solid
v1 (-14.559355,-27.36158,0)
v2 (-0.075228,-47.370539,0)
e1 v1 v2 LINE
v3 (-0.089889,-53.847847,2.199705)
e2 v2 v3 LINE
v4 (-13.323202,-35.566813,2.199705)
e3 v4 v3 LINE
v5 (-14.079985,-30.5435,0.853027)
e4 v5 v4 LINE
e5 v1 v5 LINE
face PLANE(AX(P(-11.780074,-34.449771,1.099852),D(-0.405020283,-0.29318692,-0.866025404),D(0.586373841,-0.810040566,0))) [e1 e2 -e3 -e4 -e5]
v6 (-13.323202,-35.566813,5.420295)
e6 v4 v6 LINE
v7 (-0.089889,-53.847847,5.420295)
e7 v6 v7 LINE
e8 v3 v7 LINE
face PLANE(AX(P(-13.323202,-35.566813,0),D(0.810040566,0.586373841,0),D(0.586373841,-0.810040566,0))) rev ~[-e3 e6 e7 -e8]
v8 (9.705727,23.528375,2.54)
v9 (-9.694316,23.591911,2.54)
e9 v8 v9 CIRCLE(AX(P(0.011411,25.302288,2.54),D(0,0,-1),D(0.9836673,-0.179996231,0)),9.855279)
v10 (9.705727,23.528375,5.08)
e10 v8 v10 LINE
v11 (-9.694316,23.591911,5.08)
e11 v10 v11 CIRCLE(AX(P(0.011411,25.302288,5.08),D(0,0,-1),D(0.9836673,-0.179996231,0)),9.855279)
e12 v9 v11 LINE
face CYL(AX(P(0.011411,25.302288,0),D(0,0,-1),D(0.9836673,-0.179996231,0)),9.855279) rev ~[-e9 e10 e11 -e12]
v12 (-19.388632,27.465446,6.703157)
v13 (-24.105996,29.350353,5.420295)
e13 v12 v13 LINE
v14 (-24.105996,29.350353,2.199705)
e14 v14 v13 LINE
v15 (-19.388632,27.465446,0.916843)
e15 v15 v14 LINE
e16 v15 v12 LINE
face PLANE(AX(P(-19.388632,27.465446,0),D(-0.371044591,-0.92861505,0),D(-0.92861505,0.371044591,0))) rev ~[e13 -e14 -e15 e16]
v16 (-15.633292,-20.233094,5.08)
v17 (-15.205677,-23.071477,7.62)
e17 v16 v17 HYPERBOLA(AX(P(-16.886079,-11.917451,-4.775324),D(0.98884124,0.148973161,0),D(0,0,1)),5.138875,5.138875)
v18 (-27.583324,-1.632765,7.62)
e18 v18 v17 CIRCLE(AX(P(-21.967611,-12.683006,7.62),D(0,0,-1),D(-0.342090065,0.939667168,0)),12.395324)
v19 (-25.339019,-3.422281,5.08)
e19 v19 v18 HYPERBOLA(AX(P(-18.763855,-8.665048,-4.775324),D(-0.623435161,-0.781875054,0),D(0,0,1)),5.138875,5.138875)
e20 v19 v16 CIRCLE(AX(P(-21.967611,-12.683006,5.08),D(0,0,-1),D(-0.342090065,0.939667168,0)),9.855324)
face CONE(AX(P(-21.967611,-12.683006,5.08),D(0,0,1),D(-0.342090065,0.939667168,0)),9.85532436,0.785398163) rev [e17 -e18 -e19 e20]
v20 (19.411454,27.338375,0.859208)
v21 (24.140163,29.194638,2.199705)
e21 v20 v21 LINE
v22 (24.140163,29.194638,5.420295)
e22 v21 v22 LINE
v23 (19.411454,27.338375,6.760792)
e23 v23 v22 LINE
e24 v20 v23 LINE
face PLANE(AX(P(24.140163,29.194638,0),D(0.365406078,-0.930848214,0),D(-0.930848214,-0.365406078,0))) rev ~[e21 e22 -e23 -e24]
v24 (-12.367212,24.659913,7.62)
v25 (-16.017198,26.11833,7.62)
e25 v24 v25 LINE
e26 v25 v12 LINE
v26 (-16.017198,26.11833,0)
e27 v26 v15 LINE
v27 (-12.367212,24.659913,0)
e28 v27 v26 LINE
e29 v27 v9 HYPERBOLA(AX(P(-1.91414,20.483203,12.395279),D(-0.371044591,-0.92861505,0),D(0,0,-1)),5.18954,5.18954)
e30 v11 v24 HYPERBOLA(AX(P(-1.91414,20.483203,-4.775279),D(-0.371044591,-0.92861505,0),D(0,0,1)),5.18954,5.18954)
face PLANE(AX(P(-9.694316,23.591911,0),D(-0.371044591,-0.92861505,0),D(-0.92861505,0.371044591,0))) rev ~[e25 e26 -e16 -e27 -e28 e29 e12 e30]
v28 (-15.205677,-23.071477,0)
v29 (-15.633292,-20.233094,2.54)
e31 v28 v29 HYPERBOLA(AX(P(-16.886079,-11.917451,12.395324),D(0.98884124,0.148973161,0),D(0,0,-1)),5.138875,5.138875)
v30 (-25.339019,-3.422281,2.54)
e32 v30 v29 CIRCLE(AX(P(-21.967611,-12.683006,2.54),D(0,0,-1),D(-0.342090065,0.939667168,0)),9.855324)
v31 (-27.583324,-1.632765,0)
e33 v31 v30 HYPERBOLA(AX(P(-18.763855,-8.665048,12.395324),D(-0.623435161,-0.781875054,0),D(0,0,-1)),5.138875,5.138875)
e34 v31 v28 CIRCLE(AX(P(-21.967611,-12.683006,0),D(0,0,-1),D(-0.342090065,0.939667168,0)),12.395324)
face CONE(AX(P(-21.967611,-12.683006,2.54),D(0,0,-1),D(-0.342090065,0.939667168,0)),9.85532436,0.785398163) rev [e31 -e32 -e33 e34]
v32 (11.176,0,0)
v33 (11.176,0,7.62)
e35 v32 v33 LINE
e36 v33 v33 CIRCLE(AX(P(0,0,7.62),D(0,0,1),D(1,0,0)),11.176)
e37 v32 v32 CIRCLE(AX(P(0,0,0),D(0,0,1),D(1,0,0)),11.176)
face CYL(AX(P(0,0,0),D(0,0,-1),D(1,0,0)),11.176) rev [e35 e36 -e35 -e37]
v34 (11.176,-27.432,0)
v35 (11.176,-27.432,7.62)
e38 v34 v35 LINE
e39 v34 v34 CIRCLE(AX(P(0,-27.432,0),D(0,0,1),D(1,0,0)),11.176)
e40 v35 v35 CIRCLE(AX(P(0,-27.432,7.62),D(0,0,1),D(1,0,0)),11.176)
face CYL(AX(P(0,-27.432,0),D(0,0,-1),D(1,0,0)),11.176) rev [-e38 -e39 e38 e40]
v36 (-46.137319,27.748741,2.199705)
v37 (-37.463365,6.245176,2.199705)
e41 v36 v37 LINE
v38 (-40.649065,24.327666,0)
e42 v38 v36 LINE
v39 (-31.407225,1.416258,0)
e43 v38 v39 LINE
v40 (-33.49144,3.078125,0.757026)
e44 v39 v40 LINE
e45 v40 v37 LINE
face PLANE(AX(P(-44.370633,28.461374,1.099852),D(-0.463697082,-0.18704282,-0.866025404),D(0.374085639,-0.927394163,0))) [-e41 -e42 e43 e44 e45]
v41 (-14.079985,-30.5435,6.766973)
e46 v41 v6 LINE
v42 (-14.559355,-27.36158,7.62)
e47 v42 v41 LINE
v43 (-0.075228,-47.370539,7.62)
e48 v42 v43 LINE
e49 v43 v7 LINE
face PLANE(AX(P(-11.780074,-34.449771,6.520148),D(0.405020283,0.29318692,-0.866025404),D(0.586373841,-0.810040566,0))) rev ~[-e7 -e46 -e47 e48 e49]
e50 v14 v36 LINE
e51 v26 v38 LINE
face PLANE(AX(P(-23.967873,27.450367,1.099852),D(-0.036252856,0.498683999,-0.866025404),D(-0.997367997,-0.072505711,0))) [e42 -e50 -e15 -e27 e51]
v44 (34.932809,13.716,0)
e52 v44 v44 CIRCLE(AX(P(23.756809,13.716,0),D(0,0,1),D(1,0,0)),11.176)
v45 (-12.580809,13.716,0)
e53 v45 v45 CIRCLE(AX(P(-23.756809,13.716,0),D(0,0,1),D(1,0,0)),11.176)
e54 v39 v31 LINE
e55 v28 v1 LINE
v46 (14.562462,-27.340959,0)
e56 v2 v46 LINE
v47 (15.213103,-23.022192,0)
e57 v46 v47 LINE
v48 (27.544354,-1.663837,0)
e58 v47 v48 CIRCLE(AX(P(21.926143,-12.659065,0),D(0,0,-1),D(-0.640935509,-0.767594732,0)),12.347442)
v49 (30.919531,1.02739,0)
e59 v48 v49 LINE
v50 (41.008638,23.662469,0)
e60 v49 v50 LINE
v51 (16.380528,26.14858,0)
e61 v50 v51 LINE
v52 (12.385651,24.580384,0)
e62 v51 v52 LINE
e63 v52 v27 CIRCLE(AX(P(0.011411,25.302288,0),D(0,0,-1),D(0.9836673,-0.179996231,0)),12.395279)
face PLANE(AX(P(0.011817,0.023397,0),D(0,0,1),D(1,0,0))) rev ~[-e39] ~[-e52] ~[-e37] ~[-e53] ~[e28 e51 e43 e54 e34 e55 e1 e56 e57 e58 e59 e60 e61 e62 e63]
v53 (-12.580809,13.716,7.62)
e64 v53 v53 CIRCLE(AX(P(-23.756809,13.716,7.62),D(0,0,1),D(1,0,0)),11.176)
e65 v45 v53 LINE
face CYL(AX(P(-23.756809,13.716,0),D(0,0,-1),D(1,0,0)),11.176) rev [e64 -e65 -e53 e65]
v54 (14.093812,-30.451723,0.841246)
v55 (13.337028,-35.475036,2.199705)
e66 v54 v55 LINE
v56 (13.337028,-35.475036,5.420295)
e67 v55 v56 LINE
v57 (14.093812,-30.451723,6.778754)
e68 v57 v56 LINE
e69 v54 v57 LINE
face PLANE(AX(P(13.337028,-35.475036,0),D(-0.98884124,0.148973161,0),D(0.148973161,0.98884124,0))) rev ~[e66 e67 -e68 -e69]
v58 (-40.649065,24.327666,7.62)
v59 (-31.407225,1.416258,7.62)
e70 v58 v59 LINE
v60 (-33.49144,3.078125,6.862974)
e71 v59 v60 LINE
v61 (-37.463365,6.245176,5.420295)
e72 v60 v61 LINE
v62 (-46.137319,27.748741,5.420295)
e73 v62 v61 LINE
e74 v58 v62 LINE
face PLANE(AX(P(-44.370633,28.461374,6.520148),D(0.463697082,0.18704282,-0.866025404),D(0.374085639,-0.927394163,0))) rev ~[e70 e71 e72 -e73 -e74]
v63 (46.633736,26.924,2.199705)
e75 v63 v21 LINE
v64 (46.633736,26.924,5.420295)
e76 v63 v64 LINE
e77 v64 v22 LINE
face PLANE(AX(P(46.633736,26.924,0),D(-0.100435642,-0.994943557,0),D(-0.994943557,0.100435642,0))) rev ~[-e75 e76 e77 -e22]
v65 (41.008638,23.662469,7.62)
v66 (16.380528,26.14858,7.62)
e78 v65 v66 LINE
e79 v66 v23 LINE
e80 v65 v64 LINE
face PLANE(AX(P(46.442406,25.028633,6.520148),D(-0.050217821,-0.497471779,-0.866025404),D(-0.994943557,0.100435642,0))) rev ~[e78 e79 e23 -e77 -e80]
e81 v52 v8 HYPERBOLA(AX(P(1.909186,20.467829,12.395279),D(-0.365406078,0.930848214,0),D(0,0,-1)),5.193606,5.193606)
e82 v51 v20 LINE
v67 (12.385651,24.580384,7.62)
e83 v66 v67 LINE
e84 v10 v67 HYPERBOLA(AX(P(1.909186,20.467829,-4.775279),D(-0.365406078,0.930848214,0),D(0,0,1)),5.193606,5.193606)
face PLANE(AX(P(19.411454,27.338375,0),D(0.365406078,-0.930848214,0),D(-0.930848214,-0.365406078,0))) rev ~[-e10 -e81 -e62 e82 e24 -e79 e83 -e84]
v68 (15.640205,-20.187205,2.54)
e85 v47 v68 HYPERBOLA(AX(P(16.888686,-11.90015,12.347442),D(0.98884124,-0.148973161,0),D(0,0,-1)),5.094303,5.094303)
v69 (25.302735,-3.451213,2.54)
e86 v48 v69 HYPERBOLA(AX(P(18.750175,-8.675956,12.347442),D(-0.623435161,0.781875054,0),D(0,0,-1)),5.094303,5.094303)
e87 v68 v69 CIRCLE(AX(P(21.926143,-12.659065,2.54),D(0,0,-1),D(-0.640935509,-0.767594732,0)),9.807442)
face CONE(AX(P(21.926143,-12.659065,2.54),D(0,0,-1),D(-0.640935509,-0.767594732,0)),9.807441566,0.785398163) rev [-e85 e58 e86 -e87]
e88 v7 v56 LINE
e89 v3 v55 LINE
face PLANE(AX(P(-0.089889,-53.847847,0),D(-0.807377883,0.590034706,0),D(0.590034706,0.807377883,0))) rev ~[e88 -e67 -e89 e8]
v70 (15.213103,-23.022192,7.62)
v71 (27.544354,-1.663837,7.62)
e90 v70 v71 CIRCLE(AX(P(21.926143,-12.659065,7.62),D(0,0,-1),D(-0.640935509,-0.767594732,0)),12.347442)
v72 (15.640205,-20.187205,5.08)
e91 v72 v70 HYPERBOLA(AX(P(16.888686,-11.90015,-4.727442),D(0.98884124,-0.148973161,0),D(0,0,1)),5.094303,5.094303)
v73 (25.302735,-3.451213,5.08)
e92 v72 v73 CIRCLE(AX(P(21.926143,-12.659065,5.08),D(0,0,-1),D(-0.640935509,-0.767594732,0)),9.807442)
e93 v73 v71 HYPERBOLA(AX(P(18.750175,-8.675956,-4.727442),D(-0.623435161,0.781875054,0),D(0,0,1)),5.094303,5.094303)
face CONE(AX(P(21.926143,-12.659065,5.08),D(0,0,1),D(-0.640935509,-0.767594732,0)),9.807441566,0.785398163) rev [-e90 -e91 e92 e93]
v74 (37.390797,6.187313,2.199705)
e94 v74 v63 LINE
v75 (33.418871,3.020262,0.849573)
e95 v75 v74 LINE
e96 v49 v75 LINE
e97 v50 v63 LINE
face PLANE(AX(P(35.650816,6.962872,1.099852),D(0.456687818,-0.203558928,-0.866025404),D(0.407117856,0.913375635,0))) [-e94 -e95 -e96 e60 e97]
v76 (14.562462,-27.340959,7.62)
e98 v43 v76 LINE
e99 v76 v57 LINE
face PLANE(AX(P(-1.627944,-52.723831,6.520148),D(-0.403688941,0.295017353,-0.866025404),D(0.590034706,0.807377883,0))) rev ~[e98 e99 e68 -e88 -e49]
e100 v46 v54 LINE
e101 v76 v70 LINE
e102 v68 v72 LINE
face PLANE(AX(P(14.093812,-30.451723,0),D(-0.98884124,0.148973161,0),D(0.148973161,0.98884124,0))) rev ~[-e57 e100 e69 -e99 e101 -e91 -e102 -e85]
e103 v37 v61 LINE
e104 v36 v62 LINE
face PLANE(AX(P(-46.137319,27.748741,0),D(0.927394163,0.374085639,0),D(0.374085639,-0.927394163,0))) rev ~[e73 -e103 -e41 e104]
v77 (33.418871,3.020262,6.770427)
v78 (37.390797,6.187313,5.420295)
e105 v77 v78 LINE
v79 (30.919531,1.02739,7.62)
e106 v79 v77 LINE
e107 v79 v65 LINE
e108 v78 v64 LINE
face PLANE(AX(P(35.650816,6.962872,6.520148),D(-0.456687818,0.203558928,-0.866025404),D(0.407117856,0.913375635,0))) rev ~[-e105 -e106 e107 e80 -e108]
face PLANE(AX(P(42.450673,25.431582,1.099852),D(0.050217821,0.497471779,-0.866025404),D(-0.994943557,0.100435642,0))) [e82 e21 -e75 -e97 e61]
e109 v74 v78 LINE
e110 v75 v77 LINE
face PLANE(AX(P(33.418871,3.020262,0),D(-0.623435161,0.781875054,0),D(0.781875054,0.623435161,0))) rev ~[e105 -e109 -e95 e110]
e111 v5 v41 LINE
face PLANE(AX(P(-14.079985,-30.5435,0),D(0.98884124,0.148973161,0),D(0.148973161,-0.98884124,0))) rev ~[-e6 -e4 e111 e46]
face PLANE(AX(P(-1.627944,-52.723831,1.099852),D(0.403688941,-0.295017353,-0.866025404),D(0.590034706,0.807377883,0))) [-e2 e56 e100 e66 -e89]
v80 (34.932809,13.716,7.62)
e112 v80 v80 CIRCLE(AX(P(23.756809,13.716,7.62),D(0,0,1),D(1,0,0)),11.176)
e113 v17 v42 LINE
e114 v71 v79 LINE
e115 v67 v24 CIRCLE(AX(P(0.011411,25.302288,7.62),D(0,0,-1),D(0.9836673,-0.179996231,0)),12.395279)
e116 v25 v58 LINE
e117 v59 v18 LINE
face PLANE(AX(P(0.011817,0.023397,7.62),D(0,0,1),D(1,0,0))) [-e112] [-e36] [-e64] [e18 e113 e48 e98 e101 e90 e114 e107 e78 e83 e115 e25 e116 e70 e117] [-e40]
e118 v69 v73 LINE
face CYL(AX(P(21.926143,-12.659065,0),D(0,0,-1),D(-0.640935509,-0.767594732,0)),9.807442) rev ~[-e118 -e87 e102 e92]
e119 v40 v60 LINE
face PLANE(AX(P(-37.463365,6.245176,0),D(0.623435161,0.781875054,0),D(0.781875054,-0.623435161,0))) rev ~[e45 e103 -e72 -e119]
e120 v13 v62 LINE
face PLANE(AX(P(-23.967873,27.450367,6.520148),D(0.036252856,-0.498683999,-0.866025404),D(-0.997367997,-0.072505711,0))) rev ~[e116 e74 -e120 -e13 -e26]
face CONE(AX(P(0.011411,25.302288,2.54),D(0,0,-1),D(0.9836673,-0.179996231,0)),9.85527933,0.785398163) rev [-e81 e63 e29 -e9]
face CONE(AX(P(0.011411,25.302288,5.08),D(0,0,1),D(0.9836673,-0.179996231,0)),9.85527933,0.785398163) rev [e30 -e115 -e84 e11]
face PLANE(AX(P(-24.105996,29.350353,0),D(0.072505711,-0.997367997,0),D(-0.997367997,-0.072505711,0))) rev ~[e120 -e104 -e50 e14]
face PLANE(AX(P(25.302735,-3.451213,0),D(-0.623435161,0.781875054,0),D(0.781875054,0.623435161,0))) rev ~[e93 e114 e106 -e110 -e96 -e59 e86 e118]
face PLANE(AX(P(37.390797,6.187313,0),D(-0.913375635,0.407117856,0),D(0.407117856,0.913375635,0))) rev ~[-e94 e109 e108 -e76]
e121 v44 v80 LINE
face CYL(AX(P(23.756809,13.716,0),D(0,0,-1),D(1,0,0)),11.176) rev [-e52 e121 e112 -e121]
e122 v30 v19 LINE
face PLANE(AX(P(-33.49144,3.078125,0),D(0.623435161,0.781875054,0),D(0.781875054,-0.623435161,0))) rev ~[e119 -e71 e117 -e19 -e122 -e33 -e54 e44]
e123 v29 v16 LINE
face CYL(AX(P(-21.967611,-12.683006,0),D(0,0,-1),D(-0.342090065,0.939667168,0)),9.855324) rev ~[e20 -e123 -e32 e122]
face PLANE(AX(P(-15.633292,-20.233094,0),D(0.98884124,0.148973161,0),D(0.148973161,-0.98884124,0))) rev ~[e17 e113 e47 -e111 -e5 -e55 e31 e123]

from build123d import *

# Parameters (mm, degrees)
F0_R       = 11.176
F1_DEPTH   = 7.62
F2_SIZE2   = 2.1997045256
F2_SIZE    = 3.81
F2_2_SIZE2 = 2.1997045256
F2_2_SIZE  = 3.81
F3_SIZE2   = 2.1997045256
F3_SIZE    = 3.81
F4_SIZE    = 2.54


# Not quite as in the source:
# - a feature names something its author has since deleted; it is built from what else it names


with BuildPart() as f1:
    # F0 (on Top) → F1 (new body)
    with BuildSketch(Plane.XY):
        with BuildLine():
            ThreePointArc((9.7057271537, 23.5283748909), (-0.0208649872, 15.4470615517), (-9.6943160077, 23.5919105566))
            Line((-9.6943160077, 23.5919105566), (-19.3886320155, 27.4654462223))
            Line((-19.3886320155, 27.4654462223), (-24.1059964708, 29.3503527439))
            Line((-24.1059964708, 29.3503527439), (-46.1373193312, 27.748740566))
            Line((-46.1373193312, 27.748740566), (-37.463364806, 6.2451757293))
            Line((-37.463364806, 6.2451757293), (-33.4914395336, 3.0781251091))
            Line((-33.4914395336, 3.0781251091), (-25.3390191684, -3.4222811682))
            ThreePointArc((-25.3390191684, -3.4222811682), (-13.4326493579, -7.7553437227), (-15.6332920147, -20.2330937227))
            Line((-15.6332920147, -20.2330937227), (-14.0799852263, -30.5435))
            Line((-14.0799852263, -30.5435), (-13.3232015704, -35.5668134979))
            Line((-13.3232015704, -35.5668134979), (-0.0898891733, -53.8478470607))
            Line((-0.0898891733, -53.8478470607), (13.3370282377, -35.4750360336))
            Line((13.3370282377, -35.4750360336), (14.0938118937, -30.4517225357))
            Line((14.0938118937, -30.4517225357), (15.6402053484, -20.1872049906))
            ThreePointArc((15.6402053484, -20.1872049906), (13.4326493579, -7.7553437227), (25.3027350274, -3.4512126568))
            Line((25.3027350274, -3.4512126568), (33.4188712518, 3.0202621318))
            Line((33.4188712518, 3.0202621318), (37.3907965242, 6.1873127519))
            Line((37.3907965242, 6.1873127519), (46.633735943, 26.924))
            Line((46.633735943, 26.924), (24.1401632357, 29.1946377686))
            Line((24.1401632357, 29.1946377686), (19.4114543073, 27.3383748909))
            Line((19.4114543073, 27.3383748909), (9.7057271537, 23.5283748909))
        make_face()
        with Locations((0, -27.432)):
            Circle(F0_R, mode=Mode.SUBTRACT)
        Circle(F0_R, mode=Mode.SUBTRACT)
        with Locations((-23.7568088766, 13.716)):
            Circle(F0_R, mode=Mode.SUBTRACT)
        with Locations((23.7568088766, 13.716)):
            Circle(F0_R, mode=Mode.SUBTRACT)
    extrude(amount=F1_DEPTH)

    # F2
    f2_edges = [f1.edges().sort_by_distance(p)[0] for p in [
        (-41.800342, 16.996958, 7.62),
        (-35.121658, 28.549547, 7.62),
        (35.38695, 28.059319, 7.62),
        (42.012266, 16.555656, 7.62),
        (6.62357, -44.661442, 7.62),
        (-6.706545, -44.70733, 7.62),
    ]]
    f2_side = f1.faces().sort_by_distance((13.256392, -27.645481, 7.62))[0]
    chamfer(f2_edges, length=F2_SIZE, length2=F2_SIZE2, reference=f2_side)

    # F2#2
    f2_2_edges = [f1.edges().sort_by_distance(p)[0] for p in [
        (-41.800342, 16.996958, 0),
        (42.012266, 16.555656, 0),
        (-35.121658, 28.549547, 0),
    ]]
    f2_2_side = f1.faces().sort_by_distance((12.353469, -7.132279, 0))[0]
    chamfer(f2_2_edges, length=F2_2_SIZE, length2=F2_2_SIZE2, reference=f2_2_side)

    # F3
    f3_edges = [f1.edges().sort_by_distance(p)[0] for p in [
        (-6.706545, -44.70733, 0),
        (6.62357, -44.661442, 0),
        (33.391083, 28.260794, 0),
    ]]
    f3_side = f1.faces().sort_by_distance((27.377875, -0.292303, 0))[0]
    chamfer(f3_edges, length=F3_SIZE, length2=F3_SIZE2, reference=f3_side)

    # F4
    f4_edges = [f1.edges().sort_by_distance(p)[0] for p in [
        (-0.020865, 15.447062, 7.62),
        (13.432649, -7.755344, 7.62),
        (-13.432649, -7.755344, 7.62),
        (-13.432649, -7.755344, 0),
        (-0.020865, 15.447062, 0),
        (13.432649, -7.755344, 0),
    ]]
    chamfer(f4_edges, length=F4_SIZE)


solid = f1.part
